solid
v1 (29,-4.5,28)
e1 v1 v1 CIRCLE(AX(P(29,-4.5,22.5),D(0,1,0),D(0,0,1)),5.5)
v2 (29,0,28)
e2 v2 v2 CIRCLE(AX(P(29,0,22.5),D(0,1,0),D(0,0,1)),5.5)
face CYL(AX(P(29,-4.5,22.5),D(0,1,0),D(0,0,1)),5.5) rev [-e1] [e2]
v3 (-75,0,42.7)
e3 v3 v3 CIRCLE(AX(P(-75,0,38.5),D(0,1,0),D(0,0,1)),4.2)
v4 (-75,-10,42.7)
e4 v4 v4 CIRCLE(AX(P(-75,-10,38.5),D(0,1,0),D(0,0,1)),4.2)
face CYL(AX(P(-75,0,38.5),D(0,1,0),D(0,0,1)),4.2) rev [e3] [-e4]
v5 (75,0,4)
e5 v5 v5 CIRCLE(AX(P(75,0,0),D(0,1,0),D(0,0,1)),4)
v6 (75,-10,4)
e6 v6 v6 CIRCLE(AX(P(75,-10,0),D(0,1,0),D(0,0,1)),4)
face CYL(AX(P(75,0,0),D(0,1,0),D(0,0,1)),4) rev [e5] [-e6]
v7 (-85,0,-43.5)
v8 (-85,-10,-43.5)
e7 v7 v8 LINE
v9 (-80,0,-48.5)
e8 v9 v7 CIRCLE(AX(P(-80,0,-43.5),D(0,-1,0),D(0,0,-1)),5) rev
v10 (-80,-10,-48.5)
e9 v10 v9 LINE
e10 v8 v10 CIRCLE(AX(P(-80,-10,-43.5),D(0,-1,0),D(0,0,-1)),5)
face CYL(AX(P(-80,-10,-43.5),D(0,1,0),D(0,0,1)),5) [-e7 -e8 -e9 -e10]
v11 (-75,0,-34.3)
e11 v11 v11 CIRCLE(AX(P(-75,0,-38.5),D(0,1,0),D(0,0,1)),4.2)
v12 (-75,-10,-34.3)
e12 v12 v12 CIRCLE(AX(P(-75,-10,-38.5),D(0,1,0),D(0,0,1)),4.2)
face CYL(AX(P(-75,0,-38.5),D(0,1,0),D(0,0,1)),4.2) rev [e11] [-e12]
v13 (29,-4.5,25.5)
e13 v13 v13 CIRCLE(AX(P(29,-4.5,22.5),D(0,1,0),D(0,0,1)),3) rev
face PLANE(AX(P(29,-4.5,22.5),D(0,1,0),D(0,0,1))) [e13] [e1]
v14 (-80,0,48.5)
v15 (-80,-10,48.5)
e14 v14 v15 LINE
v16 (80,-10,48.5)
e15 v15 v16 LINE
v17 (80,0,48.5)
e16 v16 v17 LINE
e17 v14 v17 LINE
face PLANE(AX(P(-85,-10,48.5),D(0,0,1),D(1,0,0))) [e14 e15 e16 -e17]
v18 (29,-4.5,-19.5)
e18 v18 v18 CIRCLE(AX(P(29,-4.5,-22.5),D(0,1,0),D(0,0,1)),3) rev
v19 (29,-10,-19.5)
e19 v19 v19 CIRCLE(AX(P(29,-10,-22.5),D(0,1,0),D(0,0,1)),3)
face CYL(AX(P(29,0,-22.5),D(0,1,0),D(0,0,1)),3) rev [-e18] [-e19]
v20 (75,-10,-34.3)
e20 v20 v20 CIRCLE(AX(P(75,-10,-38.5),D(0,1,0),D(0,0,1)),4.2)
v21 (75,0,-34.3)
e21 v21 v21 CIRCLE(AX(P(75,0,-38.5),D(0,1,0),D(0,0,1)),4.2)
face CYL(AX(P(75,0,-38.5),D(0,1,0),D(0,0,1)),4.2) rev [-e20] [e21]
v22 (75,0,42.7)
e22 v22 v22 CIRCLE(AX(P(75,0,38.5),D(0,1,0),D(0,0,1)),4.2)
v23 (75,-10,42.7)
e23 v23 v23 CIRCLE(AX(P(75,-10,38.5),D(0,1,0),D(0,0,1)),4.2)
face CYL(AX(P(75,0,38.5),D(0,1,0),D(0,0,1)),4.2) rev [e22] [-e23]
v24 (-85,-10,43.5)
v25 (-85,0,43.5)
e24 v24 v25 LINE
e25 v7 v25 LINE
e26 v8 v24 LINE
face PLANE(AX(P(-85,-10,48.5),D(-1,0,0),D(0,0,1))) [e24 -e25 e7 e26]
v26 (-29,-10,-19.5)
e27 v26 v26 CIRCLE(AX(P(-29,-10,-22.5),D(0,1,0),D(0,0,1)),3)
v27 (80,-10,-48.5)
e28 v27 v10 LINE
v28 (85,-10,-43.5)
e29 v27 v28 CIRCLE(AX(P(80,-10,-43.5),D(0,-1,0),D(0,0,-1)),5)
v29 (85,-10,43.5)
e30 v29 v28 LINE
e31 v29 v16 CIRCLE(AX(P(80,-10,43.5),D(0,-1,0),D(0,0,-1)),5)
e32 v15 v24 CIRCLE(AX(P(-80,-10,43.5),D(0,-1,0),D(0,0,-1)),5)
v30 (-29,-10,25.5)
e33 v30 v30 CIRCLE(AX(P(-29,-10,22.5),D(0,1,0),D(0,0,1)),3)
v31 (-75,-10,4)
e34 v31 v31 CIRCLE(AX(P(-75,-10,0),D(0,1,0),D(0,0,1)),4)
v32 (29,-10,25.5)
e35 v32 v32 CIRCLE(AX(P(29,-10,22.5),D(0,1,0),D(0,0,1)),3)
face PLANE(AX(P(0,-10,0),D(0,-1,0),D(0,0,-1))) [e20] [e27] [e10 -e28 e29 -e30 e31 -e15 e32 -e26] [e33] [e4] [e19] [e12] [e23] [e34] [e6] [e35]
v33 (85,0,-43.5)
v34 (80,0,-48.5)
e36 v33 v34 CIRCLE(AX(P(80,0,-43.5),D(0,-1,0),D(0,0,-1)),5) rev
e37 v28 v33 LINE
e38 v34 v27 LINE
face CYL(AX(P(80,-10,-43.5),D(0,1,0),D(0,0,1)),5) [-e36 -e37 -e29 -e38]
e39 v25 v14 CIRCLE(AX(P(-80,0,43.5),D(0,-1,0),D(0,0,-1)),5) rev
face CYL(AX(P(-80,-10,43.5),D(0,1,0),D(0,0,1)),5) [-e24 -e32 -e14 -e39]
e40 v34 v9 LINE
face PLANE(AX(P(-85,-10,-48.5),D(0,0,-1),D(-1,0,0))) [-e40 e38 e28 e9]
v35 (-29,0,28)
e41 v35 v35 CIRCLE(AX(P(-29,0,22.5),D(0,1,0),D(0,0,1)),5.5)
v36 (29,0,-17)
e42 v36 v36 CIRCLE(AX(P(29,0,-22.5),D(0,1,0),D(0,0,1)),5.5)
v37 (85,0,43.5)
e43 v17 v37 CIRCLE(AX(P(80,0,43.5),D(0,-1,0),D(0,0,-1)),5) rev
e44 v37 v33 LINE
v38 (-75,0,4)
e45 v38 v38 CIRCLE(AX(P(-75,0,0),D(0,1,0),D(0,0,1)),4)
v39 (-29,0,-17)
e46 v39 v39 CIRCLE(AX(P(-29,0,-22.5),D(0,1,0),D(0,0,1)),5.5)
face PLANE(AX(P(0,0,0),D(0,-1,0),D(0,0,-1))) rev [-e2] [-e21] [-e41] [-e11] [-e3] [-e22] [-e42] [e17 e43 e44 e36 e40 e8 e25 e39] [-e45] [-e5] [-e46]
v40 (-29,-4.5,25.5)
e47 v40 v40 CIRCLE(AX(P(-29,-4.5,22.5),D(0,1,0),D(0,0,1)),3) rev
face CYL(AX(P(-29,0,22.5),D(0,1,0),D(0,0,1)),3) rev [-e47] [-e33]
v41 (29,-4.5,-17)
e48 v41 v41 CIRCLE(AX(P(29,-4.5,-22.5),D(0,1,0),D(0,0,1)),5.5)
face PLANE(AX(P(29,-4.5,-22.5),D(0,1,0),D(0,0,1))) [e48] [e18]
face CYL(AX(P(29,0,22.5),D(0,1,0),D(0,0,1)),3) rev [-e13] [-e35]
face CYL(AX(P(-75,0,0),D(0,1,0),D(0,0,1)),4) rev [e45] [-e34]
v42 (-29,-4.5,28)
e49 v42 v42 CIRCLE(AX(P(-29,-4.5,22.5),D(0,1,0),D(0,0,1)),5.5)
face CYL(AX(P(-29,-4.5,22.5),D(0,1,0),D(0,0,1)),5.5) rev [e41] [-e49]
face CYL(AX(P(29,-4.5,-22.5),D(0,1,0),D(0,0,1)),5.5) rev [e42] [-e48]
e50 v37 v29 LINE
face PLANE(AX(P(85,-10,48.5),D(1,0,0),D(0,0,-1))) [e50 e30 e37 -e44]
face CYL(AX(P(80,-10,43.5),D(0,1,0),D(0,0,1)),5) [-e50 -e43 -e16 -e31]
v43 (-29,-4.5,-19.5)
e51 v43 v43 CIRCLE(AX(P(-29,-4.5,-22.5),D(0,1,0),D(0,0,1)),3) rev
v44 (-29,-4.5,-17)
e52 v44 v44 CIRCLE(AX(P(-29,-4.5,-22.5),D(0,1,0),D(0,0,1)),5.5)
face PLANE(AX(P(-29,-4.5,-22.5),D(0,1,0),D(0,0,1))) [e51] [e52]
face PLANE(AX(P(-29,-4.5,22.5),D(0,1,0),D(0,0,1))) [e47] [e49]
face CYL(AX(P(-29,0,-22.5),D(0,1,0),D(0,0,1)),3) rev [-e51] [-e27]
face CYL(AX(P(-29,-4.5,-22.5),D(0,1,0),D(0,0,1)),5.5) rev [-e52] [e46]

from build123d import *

# Parameters (mm, degrees)
SKETCH1_W                          = 170
SKETCH1_H                          = 97
BOSS_EXTRUDE1_DEPTH                = 10
FILLET1_R                          = 5
F_11_0_START                       = -10
F_11_0_11_DIAMETER_HOLE1_OUTLINE_R = 3
F_11_0_11_DIAMETER_HOLE1_DEPTH     = 10
SKETCH7_R                          = 5.5
CUT_EXTRUDE1_DEPTH                 = 4.5
M8_CLEARANCE_HOLE1_D               = 8.4
F_8_0MM_DOWEL_HOLE1_D              = 8


# Read off the part's stored shape, not the designer's step: Ø11.0 (11) Diameter Hole1
with BuildPart() as part:
    # Sketch1 → Boss-Extrude1 (new body)
    with BuildSketch(Plane(origin=(0, 0, 0), x_dir=(1, 0, 0), z_dir=(0, 1, 0))):
        Rectangle(SKETCH1_W, SKETCH1_H)
    extrude(amount=-BOSS_EXTRUDE1_DEPTH)

    # Fillet1
    fillet1_edges = [part.edges().sort_by_distance(p)[0] for p in [
        (85, -5, 48.5),
        (-85, -5, 48.5),
        (-85, -5, -48.5),
        (85, -5, -48.5),
    ]]
    fillet(fillet1_edges, radius=FILLET1_R)

    # Ø11.0 (11) Diameter Hole1 outline → Ø11.0 (11) Diameter Hole1 (cut)
    with BuildSketch(Plane(origin=(0, 0, 0), x_dir=(1, 0, 0), z_dir=(0, 1, 0)).offset(F_11_0_START)):
        with Locations((29, -22.5)):
            Circle(F_11_0_11_DIAMETER_HOLE1_OUTLINE_R)
        with Locations((-29, 22.5)):
            Circle(F_11_0_11_DIAMETER_HOLE1_OUTLINE_R)
        with Locations((-29, -22.5)):
            Circle(F_11_0_11_DIAMETER_HOLE1_OUTLINE_R)
        with Locations((29, 22.5)):
            Circle(F_11_0_11_DIAMETER_HOLE1_OUTLINE_R)
    extrude(amount=F_11_0_11_DIAMETER_HOLE1_DEPTH, mode=Mode.SUBTRACT)

    # Sketch7 → Cut-Extrude1 (cut)
    with BuildSketch(Plane(origin=(0, 0, 0), x_dir=(1, 0, 0), z_dir=(0, 1, 0))):
        with Locations(Location((-29, 22.5, 0), (0, 0, 270))):
            Circle(SKETCH7_R)
        with Locations(Location((29, 22.5, 0), (0, 0, 270))):
            Circle(SKETCH7_R)
        with Locations(Location((29, -22.5, 0), (0, 0, 270))):
            Circle(SKETCH7_R)
        with Locations(Location((-29, -22.5, 0), (0, 0, 270))):
            Circle(SKETCH7_R)
    extrude(amount=-CUT_EXTRUDE1_DEPTH, mode=Mode.SUBTRACT)

    # M8 Clearance Hole1 (through all)
    with Locations(Plane(origin=(0, 0, 0), x_dir=(1, 0, 0), z_dir=(0, 1, 0))):
        with Locations((-75, -38.5), (-75, 38.5), (75, -38.5), (75, 38.5)):
            Hole(M8_CLEARANCE_HOLE1_D / 2)

    # Ø8.0mm Dowel Hole1 (through all)
    with Locations(Plane(origin=(0, 0, 0), x_dir=(1, 0, 0), z_dir=(0, 1, 0))):
        with Locations((-75, 0), (75, 0)):
            Hole(F_8_0MM_DOWEL_HOLE1_D / 2)


solid = part.part
